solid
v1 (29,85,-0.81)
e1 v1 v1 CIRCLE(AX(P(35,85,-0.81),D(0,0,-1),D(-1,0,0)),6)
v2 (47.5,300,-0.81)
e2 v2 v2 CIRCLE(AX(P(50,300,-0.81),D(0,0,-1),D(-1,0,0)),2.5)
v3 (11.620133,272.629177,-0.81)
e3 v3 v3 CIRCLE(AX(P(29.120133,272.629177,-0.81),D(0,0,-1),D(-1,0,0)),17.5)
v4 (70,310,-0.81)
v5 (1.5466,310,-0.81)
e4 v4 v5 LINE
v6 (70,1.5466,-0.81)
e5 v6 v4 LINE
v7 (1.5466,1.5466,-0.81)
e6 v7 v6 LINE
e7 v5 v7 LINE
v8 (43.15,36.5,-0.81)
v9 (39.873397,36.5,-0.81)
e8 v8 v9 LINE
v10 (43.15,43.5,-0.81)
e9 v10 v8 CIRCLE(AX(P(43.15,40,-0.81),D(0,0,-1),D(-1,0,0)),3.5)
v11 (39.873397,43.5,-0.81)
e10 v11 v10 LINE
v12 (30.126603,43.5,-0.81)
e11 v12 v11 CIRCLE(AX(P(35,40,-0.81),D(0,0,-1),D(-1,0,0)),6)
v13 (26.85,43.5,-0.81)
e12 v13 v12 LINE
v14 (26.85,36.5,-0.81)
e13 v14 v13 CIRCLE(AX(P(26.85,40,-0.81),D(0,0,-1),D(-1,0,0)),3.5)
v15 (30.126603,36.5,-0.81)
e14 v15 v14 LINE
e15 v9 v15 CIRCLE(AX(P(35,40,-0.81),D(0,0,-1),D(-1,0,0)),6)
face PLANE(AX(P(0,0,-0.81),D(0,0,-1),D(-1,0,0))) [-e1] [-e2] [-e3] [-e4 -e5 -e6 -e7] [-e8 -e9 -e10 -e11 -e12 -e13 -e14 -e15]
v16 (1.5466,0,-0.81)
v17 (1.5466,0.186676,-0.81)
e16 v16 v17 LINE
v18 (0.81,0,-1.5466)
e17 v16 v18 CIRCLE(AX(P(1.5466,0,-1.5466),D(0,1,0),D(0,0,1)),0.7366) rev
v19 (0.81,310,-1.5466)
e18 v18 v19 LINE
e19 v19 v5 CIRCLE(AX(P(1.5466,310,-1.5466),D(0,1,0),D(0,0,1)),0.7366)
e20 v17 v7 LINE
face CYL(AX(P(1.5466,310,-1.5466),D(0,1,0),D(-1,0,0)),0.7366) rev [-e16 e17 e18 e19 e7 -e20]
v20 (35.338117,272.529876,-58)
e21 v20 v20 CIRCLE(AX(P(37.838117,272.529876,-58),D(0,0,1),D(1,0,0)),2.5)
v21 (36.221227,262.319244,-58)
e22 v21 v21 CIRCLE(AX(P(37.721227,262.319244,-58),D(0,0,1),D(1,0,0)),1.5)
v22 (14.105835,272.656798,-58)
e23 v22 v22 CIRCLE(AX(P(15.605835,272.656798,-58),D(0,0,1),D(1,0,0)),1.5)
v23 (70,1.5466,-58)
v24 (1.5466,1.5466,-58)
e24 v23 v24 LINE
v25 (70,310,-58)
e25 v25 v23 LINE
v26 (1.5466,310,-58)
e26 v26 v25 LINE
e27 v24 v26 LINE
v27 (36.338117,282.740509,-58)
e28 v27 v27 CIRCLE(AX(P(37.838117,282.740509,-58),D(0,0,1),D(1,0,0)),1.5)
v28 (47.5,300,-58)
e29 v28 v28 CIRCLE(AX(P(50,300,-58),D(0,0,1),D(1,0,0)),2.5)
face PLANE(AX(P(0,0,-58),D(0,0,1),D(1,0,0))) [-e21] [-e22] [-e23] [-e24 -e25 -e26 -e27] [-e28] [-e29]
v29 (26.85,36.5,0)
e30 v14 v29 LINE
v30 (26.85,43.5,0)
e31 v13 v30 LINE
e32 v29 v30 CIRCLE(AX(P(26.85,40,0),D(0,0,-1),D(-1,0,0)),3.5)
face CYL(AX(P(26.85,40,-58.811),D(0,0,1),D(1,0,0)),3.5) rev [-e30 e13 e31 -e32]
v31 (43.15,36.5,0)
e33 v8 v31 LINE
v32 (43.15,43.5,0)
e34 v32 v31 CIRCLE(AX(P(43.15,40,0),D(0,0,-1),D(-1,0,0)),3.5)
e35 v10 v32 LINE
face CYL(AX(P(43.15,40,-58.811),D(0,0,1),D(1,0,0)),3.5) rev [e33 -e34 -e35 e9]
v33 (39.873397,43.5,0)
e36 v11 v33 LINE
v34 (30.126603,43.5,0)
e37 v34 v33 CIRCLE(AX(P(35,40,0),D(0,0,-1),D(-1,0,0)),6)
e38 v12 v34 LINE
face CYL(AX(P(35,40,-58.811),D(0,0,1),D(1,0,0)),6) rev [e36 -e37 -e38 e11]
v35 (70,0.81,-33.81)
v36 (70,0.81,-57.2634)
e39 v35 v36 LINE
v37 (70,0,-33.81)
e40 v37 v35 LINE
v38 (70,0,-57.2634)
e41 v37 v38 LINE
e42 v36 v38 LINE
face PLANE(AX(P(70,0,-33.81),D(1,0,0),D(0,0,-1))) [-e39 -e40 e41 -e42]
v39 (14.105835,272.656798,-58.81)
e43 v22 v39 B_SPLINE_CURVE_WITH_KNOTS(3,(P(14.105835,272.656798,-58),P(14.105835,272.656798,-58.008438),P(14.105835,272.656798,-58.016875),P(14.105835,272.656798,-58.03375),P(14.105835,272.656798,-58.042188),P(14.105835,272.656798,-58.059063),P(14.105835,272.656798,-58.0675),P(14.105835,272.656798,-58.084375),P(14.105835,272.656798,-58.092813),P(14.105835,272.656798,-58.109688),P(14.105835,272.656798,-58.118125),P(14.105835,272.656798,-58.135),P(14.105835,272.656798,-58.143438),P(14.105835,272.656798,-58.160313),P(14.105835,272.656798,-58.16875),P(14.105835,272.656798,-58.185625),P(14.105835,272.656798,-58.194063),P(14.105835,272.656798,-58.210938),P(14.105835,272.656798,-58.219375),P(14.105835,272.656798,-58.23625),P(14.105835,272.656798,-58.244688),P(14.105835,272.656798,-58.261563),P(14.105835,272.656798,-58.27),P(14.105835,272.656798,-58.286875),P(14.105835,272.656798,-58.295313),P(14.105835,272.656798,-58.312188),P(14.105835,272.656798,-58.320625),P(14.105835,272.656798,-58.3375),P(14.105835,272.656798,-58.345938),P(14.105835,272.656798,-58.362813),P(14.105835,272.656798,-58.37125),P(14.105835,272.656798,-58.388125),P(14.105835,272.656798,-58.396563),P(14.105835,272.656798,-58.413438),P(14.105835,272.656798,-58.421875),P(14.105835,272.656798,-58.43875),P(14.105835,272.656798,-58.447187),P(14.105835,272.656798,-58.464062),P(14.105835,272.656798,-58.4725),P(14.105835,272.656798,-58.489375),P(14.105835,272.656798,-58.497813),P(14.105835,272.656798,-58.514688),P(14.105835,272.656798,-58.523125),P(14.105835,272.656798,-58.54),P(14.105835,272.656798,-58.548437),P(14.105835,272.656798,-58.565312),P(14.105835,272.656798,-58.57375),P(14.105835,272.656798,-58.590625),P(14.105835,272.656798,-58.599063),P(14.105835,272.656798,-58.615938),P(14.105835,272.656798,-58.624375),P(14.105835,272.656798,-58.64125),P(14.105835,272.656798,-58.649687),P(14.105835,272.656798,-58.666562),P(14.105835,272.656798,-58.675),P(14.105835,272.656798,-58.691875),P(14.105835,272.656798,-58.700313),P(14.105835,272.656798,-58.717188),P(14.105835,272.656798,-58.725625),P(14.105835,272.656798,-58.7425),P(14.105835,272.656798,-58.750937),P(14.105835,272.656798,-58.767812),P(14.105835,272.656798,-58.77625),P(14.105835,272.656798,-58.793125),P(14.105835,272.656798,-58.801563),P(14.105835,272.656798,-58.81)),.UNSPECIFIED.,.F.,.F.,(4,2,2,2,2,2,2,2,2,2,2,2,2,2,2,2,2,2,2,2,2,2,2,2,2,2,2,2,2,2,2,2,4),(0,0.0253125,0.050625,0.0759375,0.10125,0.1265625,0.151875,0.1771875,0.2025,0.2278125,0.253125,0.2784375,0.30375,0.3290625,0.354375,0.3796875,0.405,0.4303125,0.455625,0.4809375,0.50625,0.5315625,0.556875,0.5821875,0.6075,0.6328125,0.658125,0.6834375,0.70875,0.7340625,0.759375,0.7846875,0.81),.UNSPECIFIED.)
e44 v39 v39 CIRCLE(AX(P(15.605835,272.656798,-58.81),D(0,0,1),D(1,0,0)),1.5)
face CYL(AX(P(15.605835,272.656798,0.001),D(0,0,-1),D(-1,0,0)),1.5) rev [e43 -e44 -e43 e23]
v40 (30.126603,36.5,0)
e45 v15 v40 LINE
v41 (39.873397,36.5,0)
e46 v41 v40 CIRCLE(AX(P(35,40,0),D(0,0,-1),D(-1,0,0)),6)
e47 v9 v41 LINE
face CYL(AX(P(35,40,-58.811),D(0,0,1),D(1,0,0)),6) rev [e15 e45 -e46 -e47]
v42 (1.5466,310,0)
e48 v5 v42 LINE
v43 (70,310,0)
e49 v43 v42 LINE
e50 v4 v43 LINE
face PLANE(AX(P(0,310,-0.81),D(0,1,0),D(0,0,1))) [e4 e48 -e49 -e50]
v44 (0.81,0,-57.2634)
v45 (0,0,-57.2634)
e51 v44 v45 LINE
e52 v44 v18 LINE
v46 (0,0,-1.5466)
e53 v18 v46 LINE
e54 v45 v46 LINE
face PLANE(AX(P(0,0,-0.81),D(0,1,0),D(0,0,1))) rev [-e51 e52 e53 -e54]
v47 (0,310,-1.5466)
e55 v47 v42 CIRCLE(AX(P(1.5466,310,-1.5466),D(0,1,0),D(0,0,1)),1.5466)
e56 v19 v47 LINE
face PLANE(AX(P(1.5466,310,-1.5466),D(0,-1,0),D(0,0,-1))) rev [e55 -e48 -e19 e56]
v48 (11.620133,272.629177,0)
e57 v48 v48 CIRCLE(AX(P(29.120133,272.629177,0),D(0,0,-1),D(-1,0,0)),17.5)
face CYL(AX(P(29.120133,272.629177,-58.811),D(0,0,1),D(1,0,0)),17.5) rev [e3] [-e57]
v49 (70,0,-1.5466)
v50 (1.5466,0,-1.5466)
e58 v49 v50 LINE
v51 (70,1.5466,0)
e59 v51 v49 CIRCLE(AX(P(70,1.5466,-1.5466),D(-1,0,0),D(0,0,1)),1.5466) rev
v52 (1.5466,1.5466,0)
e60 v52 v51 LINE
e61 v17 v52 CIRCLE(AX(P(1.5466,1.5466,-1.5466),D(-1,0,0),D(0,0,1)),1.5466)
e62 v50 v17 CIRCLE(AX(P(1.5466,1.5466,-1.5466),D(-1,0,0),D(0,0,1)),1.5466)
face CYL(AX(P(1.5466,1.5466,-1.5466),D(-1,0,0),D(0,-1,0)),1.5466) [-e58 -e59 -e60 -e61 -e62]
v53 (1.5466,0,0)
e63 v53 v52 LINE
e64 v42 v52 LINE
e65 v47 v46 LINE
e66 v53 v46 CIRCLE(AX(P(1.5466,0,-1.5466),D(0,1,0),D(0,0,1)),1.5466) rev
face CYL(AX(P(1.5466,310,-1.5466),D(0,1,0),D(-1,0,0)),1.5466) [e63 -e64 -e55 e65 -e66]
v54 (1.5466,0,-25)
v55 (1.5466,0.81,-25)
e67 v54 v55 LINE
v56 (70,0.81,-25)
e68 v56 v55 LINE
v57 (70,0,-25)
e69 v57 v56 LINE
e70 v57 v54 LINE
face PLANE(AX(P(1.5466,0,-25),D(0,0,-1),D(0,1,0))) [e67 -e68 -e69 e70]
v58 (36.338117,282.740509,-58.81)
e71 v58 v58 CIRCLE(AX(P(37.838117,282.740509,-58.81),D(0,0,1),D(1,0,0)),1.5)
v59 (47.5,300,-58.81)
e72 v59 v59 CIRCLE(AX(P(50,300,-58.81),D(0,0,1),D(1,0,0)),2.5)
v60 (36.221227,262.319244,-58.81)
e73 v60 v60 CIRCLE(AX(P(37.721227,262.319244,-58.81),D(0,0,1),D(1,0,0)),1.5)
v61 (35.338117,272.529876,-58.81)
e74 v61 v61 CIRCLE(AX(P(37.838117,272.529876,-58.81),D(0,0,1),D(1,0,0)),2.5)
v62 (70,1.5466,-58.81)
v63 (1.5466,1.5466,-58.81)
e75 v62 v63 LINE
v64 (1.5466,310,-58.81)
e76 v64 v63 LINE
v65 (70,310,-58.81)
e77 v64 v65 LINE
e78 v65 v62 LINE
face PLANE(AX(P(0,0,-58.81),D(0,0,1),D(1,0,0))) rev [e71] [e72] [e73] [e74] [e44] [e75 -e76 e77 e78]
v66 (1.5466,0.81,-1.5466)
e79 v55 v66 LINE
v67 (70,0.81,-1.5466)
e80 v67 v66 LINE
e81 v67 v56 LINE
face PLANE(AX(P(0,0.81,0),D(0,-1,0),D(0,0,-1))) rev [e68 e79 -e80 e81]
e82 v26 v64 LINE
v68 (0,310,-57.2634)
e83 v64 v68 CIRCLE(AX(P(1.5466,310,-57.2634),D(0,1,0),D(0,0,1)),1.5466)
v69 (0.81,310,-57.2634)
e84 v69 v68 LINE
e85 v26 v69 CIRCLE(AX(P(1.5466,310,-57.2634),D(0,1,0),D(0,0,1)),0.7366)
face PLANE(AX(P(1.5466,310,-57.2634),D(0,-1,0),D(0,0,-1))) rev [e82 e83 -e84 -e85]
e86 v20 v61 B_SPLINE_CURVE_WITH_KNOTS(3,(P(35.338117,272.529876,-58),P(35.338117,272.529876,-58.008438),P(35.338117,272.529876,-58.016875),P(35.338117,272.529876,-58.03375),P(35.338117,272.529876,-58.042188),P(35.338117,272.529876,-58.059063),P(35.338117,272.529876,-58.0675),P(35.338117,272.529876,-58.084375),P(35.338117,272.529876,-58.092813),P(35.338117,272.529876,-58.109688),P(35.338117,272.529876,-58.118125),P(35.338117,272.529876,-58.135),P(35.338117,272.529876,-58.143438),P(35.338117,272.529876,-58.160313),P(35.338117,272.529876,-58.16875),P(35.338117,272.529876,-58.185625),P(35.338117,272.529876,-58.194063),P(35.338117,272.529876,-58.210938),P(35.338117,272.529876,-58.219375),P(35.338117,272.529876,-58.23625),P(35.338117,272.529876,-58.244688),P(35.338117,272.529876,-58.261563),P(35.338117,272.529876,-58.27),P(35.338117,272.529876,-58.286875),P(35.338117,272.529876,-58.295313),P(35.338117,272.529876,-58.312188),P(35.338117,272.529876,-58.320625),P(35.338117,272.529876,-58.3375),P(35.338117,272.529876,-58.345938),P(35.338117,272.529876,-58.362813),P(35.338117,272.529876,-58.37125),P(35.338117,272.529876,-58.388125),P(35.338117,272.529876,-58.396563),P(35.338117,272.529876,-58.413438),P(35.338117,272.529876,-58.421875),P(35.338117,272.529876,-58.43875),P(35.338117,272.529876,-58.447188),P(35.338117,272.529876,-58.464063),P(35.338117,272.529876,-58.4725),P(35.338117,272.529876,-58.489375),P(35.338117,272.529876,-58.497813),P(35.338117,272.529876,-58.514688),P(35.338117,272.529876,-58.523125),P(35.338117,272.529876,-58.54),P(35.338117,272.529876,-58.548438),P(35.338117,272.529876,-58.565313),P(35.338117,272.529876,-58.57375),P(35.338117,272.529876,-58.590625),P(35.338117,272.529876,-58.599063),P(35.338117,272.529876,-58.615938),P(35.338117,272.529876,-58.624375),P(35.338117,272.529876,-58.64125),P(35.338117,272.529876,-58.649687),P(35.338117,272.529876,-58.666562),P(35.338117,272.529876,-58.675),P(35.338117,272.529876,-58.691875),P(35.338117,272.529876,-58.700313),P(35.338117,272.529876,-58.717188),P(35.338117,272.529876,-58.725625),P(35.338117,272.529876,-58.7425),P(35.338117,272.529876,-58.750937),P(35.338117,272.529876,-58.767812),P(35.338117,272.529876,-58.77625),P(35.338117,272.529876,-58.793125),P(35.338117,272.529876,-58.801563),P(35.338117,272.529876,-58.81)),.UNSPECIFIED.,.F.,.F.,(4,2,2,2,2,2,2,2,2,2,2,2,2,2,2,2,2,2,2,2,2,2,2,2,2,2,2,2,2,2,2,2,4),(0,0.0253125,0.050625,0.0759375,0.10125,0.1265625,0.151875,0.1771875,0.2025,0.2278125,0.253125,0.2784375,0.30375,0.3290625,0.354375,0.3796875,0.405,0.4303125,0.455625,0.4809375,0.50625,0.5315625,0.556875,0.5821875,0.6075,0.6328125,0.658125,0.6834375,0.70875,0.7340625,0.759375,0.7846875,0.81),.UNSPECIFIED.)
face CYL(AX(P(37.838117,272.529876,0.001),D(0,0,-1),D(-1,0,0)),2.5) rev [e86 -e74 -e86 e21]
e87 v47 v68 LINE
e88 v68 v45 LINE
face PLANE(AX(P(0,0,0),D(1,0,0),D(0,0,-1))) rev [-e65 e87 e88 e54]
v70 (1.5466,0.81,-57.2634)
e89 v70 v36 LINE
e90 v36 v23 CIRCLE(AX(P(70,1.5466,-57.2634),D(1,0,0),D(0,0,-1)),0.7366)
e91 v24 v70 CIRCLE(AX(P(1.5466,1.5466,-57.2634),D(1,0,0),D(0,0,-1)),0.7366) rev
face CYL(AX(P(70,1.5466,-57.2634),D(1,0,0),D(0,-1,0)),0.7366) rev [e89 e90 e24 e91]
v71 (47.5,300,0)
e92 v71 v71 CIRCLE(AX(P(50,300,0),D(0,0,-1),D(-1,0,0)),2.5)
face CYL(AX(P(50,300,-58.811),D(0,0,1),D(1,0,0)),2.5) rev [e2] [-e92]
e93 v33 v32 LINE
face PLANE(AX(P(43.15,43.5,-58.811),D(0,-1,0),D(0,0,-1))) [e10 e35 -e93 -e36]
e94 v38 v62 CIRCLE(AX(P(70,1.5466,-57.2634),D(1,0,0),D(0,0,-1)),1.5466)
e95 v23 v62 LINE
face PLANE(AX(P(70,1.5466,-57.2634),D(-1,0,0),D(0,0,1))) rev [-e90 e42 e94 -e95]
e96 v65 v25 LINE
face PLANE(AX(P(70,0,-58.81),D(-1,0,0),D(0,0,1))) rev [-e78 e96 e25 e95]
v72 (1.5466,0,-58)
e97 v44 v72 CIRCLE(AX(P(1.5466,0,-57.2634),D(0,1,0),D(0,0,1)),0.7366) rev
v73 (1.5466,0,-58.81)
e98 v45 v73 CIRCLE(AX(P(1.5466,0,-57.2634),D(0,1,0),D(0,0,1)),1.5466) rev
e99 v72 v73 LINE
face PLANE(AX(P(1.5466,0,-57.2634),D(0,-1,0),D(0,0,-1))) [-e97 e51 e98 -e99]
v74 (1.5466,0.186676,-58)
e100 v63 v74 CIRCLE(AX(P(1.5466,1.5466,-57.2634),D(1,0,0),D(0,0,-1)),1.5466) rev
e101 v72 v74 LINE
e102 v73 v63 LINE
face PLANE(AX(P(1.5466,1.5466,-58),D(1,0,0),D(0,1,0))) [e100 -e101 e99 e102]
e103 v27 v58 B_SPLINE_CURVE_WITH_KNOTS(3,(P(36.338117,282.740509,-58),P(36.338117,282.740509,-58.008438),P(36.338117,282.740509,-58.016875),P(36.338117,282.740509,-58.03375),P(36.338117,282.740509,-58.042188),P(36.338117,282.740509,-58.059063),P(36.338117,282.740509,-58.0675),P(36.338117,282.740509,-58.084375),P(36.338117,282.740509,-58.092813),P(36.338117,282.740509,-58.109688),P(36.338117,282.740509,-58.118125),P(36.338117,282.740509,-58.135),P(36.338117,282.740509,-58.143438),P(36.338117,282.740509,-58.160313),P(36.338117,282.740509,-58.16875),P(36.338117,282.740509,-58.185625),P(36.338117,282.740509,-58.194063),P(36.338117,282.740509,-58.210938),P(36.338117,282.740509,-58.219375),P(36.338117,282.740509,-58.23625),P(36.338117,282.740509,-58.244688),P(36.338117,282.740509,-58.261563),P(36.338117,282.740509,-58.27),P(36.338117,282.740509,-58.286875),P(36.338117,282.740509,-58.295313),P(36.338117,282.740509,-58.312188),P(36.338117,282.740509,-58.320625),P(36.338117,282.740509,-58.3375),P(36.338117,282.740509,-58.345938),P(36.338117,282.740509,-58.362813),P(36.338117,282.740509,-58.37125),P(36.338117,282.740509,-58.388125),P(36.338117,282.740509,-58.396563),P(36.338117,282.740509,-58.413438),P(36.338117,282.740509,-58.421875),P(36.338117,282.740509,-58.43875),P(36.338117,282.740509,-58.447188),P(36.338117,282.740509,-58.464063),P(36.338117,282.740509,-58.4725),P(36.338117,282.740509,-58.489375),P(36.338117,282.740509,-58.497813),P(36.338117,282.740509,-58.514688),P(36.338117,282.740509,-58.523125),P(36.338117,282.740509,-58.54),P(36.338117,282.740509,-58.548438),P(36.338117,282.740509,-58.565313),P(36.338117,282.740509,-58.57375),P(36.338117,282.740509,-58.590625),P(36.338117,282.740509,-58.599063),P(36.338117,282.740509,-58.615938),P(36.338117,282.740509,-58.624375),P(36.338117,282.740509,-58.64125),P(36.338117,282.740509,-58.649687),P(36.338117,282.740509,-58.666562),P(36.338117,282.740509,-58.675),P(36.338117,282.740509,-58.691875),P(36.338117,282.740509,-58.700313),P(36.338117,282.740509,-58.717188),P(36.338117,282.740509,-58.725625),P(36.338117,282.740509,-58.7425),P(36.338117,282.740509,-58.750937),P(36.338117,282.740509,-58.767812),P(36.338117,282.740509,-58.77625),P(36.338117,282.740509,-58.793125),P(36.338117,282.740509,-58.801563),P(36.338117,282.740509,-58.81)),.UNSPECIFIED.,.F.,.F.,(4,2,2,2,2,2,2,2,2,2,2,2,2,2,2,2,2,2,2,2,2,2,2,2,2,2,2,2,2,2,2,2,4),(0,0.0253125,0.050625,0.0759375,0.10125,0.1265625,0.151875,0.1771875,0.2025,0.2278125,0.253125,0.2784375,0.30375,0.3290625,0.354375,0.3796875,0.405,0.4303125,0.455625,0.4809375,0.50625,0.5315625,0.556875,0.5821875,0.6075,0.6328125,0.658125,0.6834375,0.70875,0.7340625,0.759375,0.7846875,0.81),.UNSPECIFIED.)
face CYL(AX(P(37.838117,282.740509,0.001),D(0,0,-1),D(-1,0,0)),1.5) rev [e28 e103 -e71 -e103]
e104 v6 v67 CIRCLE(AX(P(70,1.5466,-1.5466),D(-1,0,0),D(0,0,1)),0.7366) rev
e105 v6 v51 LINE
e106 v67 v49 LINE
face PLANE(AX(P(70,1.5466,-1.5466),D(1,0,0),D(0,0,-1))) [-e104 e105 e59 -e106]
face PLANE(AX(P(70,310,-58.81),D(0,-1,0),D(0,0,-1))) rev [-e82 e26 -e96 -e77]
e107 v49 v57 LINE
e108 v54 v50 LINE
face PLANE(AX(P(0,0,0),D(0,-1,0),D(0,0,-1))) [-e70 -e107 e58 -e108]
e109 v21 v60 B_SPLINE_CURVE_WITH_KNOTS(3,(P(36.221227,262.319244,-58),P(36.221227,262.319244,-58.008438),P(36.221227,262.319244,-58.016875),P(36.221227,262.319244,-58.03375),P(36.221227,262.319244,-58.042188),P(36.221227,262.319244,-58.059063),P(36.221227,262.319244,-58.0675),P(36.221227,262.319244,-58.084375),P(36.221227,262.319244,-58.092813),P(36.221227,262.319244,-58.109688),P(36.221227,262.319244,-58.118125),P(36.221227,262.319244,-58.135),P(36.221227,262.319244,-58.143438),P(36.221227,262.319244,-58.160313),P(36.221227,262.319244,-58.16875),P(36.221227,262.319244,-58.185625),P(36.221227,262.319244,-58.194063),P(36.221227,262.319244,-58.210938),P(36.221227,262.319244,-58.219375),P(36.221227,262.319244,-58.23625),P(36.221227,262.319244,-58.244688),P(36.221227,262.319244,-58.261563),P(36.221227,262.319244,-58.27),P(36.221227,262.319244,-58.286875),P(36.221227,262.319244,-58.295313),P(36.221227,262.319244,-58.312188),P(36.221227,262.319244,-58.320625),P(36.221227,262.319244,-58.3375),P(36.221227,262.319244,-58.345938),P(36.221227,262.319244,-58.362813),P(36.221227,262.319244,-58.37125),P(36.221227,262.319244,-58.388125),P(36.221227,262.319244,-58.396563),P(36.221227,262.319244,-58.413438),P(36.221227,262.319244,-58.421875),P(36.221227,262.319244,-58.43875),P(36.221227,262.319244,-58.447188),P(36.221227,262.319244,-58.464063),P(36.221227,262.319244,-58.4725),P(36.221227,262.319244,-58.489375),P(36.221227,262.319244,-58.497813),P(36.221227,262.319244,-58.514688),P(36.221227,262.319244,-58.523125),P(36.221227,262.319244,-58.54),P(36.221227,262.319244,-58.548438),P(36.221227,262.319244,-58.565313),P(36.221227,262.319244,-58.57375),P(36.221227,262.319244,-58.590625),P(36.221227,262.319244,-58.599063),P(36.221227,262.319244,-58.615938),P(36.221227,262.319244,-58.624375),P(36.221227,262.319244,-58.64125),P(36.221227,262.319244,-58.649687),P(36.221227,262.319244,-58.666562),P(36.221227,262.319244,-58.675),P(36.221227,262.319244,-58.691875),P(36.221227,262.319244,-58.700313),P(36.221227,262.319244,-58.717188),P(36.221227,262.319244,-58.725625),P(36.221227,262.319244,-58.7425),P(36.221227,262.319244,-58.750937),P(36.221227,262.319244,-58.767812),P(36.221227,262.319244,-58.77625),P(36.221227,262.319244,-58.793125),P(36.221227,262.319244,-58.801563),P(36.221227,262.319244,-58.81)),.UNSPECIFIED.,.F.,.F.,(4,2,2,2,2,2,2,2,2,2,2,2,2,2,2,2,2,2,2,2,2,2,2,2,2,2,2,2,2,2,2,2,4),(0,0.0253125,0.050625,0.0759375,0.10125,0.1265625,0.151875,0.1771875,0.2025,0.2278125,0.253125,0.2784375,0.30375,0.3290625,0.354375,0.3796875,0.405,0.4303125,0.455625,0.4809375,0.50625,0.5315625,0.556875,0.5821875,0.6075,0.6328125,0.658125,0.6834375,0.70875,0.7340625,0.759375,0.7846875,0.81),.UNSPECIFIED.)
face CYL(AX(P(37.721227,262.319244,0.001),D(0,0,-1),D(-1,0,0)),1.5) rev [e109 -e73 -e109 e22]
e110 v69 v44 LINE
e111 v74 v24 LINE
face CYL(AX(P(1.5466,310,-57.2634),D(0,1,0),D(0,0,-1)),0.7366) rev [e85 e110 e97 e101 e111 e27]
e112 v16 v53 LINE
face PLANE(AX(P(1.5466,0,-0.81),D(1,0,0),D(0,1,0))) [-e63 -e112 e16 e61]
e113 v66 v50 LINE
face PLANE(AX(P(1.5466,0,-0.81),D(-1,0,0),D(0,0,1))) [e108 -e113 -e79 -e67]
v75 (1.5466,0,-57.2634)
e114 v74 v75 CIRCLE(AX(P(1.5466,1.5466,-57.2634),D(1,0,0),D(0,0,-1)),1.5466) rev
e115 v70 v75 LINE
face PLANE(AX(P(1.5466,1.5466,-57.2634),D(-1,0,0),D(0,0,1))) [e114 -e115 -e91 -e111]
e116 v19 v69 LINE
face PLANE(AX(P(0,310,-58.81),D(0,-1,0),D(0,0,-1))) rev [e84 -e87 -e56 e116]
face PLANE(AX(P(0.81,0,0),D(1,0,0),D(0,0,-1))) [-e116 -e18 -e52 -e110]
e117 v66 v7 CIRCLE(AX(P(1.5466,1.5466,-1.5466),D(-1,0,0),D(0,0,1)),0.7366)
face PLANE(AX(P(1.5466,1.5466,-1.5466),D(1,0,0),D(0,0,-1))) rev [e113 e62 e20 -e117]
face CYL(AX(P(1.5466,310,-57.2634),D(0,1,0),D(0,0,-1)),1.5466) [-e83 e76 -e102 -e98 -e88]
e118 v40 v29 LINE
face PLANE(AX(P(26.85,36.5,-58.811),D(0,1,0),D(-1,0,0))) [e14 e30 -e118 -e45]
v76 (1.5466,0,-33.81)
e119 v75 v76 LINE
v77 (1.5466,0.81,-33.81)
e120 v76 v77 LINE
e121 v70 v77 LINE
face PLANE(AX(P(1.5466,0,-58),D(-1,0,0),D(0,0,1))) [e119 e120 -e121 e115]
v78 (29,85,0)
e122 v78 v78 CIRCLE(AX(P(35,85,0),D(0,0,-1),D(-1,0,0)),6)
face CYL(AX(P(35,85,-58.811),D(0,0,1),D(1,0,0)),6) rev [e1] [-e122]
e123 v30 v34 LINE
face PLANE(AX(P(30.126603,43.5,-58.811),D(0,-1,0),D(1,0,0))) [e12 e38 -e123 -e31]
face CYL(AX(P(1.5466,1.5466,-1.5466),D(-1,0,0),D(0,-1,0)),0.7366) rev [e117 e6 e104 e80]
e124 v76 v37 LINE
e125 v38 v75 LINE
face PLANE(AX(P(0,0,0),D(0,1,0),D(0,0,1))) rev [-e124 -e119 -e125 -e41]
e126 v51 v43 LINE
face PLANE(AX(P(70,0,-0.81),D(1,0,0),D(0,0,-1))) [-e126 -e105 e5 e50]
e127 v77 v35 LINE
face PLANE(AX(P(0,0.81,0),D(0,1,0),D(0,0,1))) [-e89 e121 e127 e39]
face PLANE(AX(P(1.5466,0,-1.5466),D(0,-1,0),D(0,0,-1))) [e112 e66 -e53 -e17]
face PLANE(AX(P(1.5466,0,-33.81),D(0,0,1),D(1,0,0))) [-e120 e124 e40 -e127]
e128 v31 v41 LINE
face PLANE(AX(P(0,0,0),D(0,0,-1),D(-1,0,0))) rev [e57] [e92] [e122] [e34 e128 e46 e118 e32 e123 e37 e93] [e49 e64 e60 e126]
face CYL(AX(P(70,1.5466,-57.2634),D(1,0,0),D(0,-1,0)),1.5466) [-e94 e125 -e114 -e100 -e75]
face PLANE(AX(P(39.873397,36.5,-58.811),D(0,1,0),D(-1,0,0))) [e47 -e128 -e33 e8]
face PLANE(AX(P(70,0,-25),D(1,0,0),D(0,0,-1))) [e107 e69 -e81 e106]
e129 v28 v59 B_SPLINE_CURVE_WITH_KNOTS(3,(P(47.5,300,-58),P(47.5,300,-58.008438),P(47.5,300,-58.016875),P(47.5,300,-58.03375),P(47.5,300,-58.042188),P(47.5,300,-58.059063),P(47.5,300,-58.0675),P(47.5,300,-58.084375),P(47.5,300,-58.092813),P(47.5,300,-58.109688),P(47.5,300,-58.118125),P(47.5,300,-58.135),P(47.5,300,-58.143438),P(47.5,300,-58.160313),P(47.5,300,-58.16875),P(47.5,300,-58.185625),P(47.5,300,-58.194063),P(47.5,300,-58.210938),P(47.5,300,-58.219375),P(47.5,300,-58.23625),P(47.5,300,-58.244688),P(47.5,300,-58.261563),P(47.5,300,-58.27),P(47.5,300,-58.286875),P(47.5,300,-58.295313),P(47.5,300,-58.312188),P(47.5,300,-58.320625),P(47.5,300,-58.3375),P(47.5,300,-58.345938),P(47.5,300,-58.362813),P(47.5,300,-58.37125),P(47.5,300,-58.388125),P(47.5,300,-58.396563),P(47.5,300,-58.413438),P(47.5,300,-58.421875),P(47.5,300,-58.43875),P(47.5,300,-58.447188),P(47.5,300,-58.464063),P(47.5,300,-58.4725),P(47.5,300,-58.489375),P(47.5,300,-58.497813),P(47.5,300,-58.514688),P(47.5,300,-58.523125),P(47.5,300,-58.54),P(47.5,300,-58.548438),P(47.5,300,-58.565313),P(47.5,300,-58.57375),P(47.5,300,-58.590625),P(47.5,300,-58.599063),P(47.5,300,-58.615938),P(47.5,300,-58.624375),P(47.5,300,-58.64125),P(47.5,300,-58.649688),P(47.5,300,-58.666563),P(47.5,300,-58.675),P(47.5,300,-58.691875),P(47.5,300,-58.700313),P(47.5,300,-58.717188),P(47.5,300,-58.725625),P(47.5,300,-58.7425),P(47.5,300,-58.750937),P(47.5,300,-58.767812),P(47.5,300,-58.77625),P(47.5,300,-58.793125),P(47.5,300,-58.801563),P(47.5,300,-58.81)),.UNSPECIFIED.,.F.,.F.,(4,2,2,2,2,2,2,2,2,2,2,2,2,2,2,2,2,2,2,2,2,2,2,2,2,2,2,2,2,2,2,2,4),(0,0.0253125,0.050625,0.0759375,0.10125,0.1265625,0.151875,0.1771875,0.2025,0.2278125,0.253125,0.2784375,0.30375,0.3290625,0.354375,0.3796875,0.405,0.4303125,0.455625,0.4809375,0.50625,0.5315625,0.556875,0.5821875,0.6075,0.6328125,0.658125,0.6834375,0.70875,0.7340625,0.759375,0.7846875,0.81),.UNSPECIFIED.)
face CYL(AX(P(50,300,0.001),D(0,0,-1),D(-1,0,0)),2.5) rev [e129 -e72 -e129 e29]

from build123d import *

# Parameters (mm, degrees)
SKETCH1_W                      = 70
SKETCH1_H                      = 310
BASE_FLANGE1_DEPTH             = 0.81
EDGE_FLANGE1_STRIP_W           = 4.7132
EDGE_FLANGE1_STRIP_H           = 0.81
EDGE_FLANGE1_STRIP_CUT_DEPTH   = 310
EDGE_FLANGE1_DEPTH             = 310
EDGE_FLANGE2_STRIP_W           = 4.7132
EDGE_FLANGE2_STRIP_H           = 0.81
EDGE_FLANGE2_STRIP_CUT_DEPTH   = 310
EDGE_FLANGE2_DEPTH             = 310
EDGE_FLANGE3_STRIP_W           = 4.7132
EDGE_FLANGE3_STRIP_H           = 0.81
EDGE_FLANGE3_STRIP_CUT_DEPTH   = 68.4534
EDGE_FLANGE3_STRIP_2_W         = 4.7132
EDGE_FLANGE3_STRIP_2_H         = 0.81
EDGE_FLANGE3_STRIP_CUT_2_DEPTH = 68.4534
EDGE_FLANGE3_DEPTH             = 68.4534
EDGE_FLANGE3_BEND_DEPTH        = 68.4534
CUT_EXTRUDE2_REACH             = 325.201
SKETCH18_R                     = 2.5
SKETCH18_R_2                   = 1.5
CUT_EXTRUDE1_REACH             = 325.201
SKETCH17_R                     = 17.5
SKETCH17_R_2                   = 2.5
SKETCH17_R_3                   = 6


# Sheet-metal steps are written as plain solids
with BuildPart() as part:
    # Sketch1 → Base-Flange1 (new body)
    with BuildSketch(Plane.XY):
        with Locations((35, 155)):
            Rectangle(SKETCH1_W, SKETCH1_H)
    extrude(amount=-BASE_FLANGE1_DEPTH)

    # Edge-Flange1 strip (across the edge) → Edge-Flange1 strip cut (cut)
    with BuildSketch(Plane(origin=(0, 0, -0.81), x_dir=(1, 0, 0), z_dir=(0, 1, 0))):
        with Locations((-0.81, -0.405)):
            Rectangle(EDGE_FLANGE1_STRIP_W, EDGE_FLANGE1_STRIP_H)
    extrude(amount=EDGE_FLANGE1_STRIP_CUT_DEPTH, mode=Mode.SUBTRACT)

    # Edge-Flange1 section (across the edge) → Edge-Flange1 (add)
    with BuildSketch(Plane(origin=(0, 0, -0.81), x_dir=(1, 0, 0), z_dir=(0, 1, 0))):
        with BuildLine():
            Line((0, 0.7366), (0, 58))
            Line((0, 58), (0.81, 58))
            Line((0.81, 58), (0.81, 0.7366))
            ThreePointArc((0.81, 0.7366), (1.025745145, 0.215745145), (1.5466, 0))
            Line((1.5466, 0), (1.5466, -0.81))
            ThreePointArc((1.5466, -0.81), (0.452988652, -0.357011348), (0, 0.7366))
        make_face()
    extrude(amount=EDGE_FLANGE1_DEPTH)

    # Edge-Flange2 strip (across the edge) → Edge-Flange2 strip cut (cut)
    with BuildSketch(Plane(origin=(0.81, 0, -58.81), x_dir=(0, 0, 1), z_dir=(0, 1, 0))):
        with Locations((-0.81, -0.405)):
            Rectangle(EDGE_FLANGE2_STRIP_W, EDGE_FLANGE2_STRIP_H)
    extrude(amount=EDGE_FLANGE2_STRIP_CUT_DEPTH, mode=Mode.SUBTRACT)

    # Edge-Flange2 section (across the edge) → Edge-Flange2 (add)
    with BuildSketch(Plane(origin=(0.81, 0, -58.81), x_dir=(0, 0, 1), z_dir=(0, 1, 0))):
        with BuildLine():
            Line((0, 0.7366), (0, 69.19))
            Line((0, 69.19), (0.81, 69.19))
            Line((0.81, 69.19), (0.81, 0.7366))
            ThreePointArc((0.81, 0.7366), (1.025745145, 0.215745145), (1.5466, 0))
            Line((1.5466, 0), (1.5466, -0.81))
            ThreePointArc((1.5466, -0.81), (0.452988652, -0.357011348), (0, 0.7366))
        make_face()
    extrude(amount=EDGE_FLANGE2_DEPTH)

    # Edge-Flange3 strip (across the edge) → Edge-Flange3 strip cut (cut)
    with BuildSketch(Plane(origin=(70, 0, -0.81), x_dir=(0, 1, 0), z_dir=(-1, 0, 0))):
        with Locations((-0.81, -0.405)):
            Rectangle(EDGE_FLANGE3_STRIP_W, EDGE_FLANGE3_STRIP_H)
    extrude(amount=EDGE_FLANGE3_STRIP_CUT_DEPTH, mode=Mode.SUBTRACT)

    # Edge-Flange3 strip 2 (across the edge) → Edge-Flange3 strip cut 2 (cut)
    with BuildSketch(Plane(origin=(1.5466, 0, -58), x_dir=(0, 1, 0), z_dir=(1, 0, 0))):
        with Locations((-0.81, -0.405)):
            Rectangle(EDGE_FLANGE3_STRIP_2_W, EDGE_FLANGE3_STRIP_2_H)
    extrude(amount=EDGE_FLANGE3_STRIP_CUT_2_DEPTH, mode=Mode.SUBTRACT)

    # Edge-Flange3 section (across the edge) → Edge-Flange3 (add)
    with BuildSketch(Plane(origin=(70, 0, -0.81), x_dir=(0, 1, 0), z_dir=(-1, 0, 0))):
        with BuildLine():
            Line((0, 0.7366), (0, 24.19))
            Line((0, 24.19), (0.81, 24.19))
            Line((0.81, 24.19), (0.81, 0.7366))
            ThreePointArc((0.81, 0.7366), (1.025745145, 0.215745145), (1.5466, 0))
            Line((1.5466, 0), (1.5466, -0.81))
            ThreePointArc((1.5466, -0.81), (0.452988652, -0.357011348), (0, 0.7366))
        make_face()
    extrude(amount=EDGE_FLANGE3_DEPTH)

    # Edge-Flange3 section 2 (across the edge) → Edge-Flange3 bend (add)
    with BuildSketch(Plane(origin=(1.5466, 0, -58), x_dir=(0, 1, 0), z_dir=(1, 0, 0))):
        with BuildLine():
            Line((0, 0.7366), (0, 24.19))
            Line((0, 24.19), (0.81, 24.19))
            Line((0.81, 24.19), (0.81, 0.7366))
            ThreePointArc((0.81, 0.7366), (1.025745145, 0.215745145), (1.5466, 0))
            Line((1.5466, 0), (1.5466, -0.81))
            ThreePointArc((1.5466, -0.81), (0.452988652, -0.357011348), (0, 0.7366))
        make_face()
    extrude(amount=EDGE_FLANGE3_BEND_DEPTH)

    # Sketch18 → Cut-Extrude2 (cut, up to next)
    with BuildSketch(Plane.XY.offset(-58.81), mode=Mode.PRIVATE) as cut_extrude2_sk1:
        with Locations(Location((37.83811715, 272.529876457, 0), (0, 0, 180))):
            Circle(SKETCH18_R)
    cut_extrude2_tool1 = extrude(cut_extrude2_sk1.sketch, amount=CUT_EXTRUDE2_REACH, mode=Mode.PRIVATE) & part.part
    # Sketch18 → Cut-Extrude2 (cut, up to next)
    with BuildSketch(Plane.XY.offset(-58.81), mode=Mode.PRIVATE) as cut_extrude2_sk2:
        with Locations(Location((50, 300, 0), (0, 0, 180))):
            Circle(SKETCH18_R)
    cut_extrude2_tool2 = extrude(cut_extrude2_sk2.sketch, amount=CUT_EXTRUDE2_REACH, mode=Mode.PRIVATE) & part.part
    # Sketch18 → Cut-Extrude2 (cut, up to next)
    with BuildSketch(Plane.XY.offset(-58.81), mode=Mode.PRIVATE) as cut_extrude2_sk3:
        with Locations(Location((37.721227194, 262.319243723, 0), (0, 0, 180))):
            Circle(SKETCH18_R_2)
    cut_extrude2_tool3 = extrude(cut_extrude2_sk3.sketch, amount=CUT_EXTRUDE2_REACH, mode=Mode.PRIVATE) & part.part
    # Sketch18 → Cut-Extrude2 (cut, up to next)
    with BuildSketch(Plane.XY.offset(-58.81), mode=Mode.PRIVATE) as cut_extrude2_sk4:
        with Locations(Location((37.83811715, 282.740509191, 0), (0, 0, 180))):
            Circle(SKETCH18_R_2)
    cut_extrude2_tool4 = extrude(cut_extrude2_sk4.sketch, amount=CUT_EXTRUDE2_REACH, mode=Mode.PRIVATE) & part.part
    # Sketch18 → Cut-Extrude2 (cut, up to next)
    with BuildSketch(Plane.XY.offset(-58.81), mode=Mode.PRIVATE) as cut_extrude2_sk5:
        with Locations(Location((15.605835414, 272.656798014, 0), (0, 0, 180))):
            Circle(SKETCH18_R_2)
    cut_extrude2_tool5 = extrude(cut_extrude2_sk5.sketch, amount=CUT_EXTRUDE2_REACH, mode=Mode.PRIVATE) & part.part
    add(cut_extrude2_tool1.solids().sort_by_distance((37.838117, 272.529876, -58.81))[0], mode=Mode.SUBTRACT)
    add(cut_extrude2_tool2.solids().sort_by_distance((50, 300, -58.81))[0], mode=Mode.SUBTRACT)
    add(cut_extrude2_tool3.solids().sort_by_distance((37.721227, 262.319244, -58.81))[0], mode=Mode.SUBTRACT)
    add(cut_extrude2_tool4.solids().sort_by_distance((37.838117, 282.740509, -58.81))[0], mode=Mode.SUBTRACT)
    add(cut_extrude2_tool5.solids().sort_by_distance((15.605835, 272.656798, -58.81))[0], mode=Mode.SUBTRACT)

    # Sketch17 → Cut-Extrude1 (cut, up to next)
    with BuildSketch(Plane(origin=(0, 0, 0), x_dir=(-1, 0, 0), z_dir=(0, 0, -1)), mode=Mode.PRIVATE) as cut_extrude1_sk1:
        with Locations((-29.120132649, 272.629176961)):
            Circle(SKETCH17_R)
    cut_extrude1_tool1 = extrude(cut_extrude1_sk1.sketch, amount=CUT_EXTRUDE1_REACH, mode=Mode.PRIVATE) & part.part
    # Sketch17 → Cut-Extrude1 (cut, up to next)
    with BuildSketch(Plane(origin=(0, 0, 0), x_dir=(-1, 0, 0), z_dir=(0, 0, -1)), mode=Mode.PRIVATE) as cut_extrude1_sk2:
        with Locations((-50, 300)):
            Circle(SKETCH17_R_2)
    cut_extrude1_tool2 = extrude(cut_extrude1_sk2.sketch, amount=CUT_EXTRUDE1_REACH, mode=Mode.PRIVATE) & part.part
    # Sketch17 → Cut-Extrude1 (cut, up to next)
    with BuildSketch(Plane(origin=(0, 0, 0), x_dir=(-1, 0, 0), z_dir=(0, 0, -1)), mode=Mode.PRIVATE) as cut_extrude1_sk3:
        with Locations((-35, 85)):
            Circle(SKETCH17_R_3)
    cut_extrude1_tool3 = extrude(cut_extrude1_sk3.sketch, amount=CUT_EXTRUDE1_REACH, mode=Mode.PRIVATE) & part.part
    # Sketch17 → Cut-Extrude1 (cut, up to next)
    with BuildSketch(Plane(origin=(0, 0, 0), x_dir=(-1, 0, 0), z_dir=(0, 0, -1)), mode=Mode.PRIVATE) as cut_extrude1_sk4:
        with BuildLine():
            Line((-43.15, 43.5), (-39.873397172, 43.5))
            ThreePointArc((-39.873397172, 43.5), (-35, 46), (-30.126602828, 43.5))
            Line((-30.126602828, 43.5), (-26.85, 43.5))
            ThreePointArc((-26.85, 43.5), (-23.35, 40), (-26.85, 36.5))
            Line((-26.85, 36.5), (-30.126602828, 36.5))
            ThreePointArc((-30.126602828, 36.5), (-35, 34), (-39.873397172, 36.5))
            Line((-39.873397172, 36.5), (-43.15, 36.5))
            ThreePointArc((-43.15, 36.5), (-46.65, 40), (-43.15, 43.5))
        make_face()
    cut_extrude1_tool4 = extrude(cut_extrude1_sk4.sketch, amount=CUT_EXTRUDE1_REACH, mode=Mode.PRIVATE) & part.part
    add(cut_extrude1_tool1.solids().sort_by_distance((29.120133, 272.629177, 0))[0], mode=Mode.SUBTRACT)
    add(cut_extrude1_tool2.solids().sort_by_distance((50, 300, 0))[0], mode=Mode.SUBTRACT)
    add(cut_extrude1_tool3.solids().sort_by_distance((35, 85, 0))[0], mode=Mode.SUBTRACT)
    add(cut_extrude1_tool4.solids().sort_by_distance((35, 40, 0))[0], mode=Mode.SUBTRACT)


solid = part.part
